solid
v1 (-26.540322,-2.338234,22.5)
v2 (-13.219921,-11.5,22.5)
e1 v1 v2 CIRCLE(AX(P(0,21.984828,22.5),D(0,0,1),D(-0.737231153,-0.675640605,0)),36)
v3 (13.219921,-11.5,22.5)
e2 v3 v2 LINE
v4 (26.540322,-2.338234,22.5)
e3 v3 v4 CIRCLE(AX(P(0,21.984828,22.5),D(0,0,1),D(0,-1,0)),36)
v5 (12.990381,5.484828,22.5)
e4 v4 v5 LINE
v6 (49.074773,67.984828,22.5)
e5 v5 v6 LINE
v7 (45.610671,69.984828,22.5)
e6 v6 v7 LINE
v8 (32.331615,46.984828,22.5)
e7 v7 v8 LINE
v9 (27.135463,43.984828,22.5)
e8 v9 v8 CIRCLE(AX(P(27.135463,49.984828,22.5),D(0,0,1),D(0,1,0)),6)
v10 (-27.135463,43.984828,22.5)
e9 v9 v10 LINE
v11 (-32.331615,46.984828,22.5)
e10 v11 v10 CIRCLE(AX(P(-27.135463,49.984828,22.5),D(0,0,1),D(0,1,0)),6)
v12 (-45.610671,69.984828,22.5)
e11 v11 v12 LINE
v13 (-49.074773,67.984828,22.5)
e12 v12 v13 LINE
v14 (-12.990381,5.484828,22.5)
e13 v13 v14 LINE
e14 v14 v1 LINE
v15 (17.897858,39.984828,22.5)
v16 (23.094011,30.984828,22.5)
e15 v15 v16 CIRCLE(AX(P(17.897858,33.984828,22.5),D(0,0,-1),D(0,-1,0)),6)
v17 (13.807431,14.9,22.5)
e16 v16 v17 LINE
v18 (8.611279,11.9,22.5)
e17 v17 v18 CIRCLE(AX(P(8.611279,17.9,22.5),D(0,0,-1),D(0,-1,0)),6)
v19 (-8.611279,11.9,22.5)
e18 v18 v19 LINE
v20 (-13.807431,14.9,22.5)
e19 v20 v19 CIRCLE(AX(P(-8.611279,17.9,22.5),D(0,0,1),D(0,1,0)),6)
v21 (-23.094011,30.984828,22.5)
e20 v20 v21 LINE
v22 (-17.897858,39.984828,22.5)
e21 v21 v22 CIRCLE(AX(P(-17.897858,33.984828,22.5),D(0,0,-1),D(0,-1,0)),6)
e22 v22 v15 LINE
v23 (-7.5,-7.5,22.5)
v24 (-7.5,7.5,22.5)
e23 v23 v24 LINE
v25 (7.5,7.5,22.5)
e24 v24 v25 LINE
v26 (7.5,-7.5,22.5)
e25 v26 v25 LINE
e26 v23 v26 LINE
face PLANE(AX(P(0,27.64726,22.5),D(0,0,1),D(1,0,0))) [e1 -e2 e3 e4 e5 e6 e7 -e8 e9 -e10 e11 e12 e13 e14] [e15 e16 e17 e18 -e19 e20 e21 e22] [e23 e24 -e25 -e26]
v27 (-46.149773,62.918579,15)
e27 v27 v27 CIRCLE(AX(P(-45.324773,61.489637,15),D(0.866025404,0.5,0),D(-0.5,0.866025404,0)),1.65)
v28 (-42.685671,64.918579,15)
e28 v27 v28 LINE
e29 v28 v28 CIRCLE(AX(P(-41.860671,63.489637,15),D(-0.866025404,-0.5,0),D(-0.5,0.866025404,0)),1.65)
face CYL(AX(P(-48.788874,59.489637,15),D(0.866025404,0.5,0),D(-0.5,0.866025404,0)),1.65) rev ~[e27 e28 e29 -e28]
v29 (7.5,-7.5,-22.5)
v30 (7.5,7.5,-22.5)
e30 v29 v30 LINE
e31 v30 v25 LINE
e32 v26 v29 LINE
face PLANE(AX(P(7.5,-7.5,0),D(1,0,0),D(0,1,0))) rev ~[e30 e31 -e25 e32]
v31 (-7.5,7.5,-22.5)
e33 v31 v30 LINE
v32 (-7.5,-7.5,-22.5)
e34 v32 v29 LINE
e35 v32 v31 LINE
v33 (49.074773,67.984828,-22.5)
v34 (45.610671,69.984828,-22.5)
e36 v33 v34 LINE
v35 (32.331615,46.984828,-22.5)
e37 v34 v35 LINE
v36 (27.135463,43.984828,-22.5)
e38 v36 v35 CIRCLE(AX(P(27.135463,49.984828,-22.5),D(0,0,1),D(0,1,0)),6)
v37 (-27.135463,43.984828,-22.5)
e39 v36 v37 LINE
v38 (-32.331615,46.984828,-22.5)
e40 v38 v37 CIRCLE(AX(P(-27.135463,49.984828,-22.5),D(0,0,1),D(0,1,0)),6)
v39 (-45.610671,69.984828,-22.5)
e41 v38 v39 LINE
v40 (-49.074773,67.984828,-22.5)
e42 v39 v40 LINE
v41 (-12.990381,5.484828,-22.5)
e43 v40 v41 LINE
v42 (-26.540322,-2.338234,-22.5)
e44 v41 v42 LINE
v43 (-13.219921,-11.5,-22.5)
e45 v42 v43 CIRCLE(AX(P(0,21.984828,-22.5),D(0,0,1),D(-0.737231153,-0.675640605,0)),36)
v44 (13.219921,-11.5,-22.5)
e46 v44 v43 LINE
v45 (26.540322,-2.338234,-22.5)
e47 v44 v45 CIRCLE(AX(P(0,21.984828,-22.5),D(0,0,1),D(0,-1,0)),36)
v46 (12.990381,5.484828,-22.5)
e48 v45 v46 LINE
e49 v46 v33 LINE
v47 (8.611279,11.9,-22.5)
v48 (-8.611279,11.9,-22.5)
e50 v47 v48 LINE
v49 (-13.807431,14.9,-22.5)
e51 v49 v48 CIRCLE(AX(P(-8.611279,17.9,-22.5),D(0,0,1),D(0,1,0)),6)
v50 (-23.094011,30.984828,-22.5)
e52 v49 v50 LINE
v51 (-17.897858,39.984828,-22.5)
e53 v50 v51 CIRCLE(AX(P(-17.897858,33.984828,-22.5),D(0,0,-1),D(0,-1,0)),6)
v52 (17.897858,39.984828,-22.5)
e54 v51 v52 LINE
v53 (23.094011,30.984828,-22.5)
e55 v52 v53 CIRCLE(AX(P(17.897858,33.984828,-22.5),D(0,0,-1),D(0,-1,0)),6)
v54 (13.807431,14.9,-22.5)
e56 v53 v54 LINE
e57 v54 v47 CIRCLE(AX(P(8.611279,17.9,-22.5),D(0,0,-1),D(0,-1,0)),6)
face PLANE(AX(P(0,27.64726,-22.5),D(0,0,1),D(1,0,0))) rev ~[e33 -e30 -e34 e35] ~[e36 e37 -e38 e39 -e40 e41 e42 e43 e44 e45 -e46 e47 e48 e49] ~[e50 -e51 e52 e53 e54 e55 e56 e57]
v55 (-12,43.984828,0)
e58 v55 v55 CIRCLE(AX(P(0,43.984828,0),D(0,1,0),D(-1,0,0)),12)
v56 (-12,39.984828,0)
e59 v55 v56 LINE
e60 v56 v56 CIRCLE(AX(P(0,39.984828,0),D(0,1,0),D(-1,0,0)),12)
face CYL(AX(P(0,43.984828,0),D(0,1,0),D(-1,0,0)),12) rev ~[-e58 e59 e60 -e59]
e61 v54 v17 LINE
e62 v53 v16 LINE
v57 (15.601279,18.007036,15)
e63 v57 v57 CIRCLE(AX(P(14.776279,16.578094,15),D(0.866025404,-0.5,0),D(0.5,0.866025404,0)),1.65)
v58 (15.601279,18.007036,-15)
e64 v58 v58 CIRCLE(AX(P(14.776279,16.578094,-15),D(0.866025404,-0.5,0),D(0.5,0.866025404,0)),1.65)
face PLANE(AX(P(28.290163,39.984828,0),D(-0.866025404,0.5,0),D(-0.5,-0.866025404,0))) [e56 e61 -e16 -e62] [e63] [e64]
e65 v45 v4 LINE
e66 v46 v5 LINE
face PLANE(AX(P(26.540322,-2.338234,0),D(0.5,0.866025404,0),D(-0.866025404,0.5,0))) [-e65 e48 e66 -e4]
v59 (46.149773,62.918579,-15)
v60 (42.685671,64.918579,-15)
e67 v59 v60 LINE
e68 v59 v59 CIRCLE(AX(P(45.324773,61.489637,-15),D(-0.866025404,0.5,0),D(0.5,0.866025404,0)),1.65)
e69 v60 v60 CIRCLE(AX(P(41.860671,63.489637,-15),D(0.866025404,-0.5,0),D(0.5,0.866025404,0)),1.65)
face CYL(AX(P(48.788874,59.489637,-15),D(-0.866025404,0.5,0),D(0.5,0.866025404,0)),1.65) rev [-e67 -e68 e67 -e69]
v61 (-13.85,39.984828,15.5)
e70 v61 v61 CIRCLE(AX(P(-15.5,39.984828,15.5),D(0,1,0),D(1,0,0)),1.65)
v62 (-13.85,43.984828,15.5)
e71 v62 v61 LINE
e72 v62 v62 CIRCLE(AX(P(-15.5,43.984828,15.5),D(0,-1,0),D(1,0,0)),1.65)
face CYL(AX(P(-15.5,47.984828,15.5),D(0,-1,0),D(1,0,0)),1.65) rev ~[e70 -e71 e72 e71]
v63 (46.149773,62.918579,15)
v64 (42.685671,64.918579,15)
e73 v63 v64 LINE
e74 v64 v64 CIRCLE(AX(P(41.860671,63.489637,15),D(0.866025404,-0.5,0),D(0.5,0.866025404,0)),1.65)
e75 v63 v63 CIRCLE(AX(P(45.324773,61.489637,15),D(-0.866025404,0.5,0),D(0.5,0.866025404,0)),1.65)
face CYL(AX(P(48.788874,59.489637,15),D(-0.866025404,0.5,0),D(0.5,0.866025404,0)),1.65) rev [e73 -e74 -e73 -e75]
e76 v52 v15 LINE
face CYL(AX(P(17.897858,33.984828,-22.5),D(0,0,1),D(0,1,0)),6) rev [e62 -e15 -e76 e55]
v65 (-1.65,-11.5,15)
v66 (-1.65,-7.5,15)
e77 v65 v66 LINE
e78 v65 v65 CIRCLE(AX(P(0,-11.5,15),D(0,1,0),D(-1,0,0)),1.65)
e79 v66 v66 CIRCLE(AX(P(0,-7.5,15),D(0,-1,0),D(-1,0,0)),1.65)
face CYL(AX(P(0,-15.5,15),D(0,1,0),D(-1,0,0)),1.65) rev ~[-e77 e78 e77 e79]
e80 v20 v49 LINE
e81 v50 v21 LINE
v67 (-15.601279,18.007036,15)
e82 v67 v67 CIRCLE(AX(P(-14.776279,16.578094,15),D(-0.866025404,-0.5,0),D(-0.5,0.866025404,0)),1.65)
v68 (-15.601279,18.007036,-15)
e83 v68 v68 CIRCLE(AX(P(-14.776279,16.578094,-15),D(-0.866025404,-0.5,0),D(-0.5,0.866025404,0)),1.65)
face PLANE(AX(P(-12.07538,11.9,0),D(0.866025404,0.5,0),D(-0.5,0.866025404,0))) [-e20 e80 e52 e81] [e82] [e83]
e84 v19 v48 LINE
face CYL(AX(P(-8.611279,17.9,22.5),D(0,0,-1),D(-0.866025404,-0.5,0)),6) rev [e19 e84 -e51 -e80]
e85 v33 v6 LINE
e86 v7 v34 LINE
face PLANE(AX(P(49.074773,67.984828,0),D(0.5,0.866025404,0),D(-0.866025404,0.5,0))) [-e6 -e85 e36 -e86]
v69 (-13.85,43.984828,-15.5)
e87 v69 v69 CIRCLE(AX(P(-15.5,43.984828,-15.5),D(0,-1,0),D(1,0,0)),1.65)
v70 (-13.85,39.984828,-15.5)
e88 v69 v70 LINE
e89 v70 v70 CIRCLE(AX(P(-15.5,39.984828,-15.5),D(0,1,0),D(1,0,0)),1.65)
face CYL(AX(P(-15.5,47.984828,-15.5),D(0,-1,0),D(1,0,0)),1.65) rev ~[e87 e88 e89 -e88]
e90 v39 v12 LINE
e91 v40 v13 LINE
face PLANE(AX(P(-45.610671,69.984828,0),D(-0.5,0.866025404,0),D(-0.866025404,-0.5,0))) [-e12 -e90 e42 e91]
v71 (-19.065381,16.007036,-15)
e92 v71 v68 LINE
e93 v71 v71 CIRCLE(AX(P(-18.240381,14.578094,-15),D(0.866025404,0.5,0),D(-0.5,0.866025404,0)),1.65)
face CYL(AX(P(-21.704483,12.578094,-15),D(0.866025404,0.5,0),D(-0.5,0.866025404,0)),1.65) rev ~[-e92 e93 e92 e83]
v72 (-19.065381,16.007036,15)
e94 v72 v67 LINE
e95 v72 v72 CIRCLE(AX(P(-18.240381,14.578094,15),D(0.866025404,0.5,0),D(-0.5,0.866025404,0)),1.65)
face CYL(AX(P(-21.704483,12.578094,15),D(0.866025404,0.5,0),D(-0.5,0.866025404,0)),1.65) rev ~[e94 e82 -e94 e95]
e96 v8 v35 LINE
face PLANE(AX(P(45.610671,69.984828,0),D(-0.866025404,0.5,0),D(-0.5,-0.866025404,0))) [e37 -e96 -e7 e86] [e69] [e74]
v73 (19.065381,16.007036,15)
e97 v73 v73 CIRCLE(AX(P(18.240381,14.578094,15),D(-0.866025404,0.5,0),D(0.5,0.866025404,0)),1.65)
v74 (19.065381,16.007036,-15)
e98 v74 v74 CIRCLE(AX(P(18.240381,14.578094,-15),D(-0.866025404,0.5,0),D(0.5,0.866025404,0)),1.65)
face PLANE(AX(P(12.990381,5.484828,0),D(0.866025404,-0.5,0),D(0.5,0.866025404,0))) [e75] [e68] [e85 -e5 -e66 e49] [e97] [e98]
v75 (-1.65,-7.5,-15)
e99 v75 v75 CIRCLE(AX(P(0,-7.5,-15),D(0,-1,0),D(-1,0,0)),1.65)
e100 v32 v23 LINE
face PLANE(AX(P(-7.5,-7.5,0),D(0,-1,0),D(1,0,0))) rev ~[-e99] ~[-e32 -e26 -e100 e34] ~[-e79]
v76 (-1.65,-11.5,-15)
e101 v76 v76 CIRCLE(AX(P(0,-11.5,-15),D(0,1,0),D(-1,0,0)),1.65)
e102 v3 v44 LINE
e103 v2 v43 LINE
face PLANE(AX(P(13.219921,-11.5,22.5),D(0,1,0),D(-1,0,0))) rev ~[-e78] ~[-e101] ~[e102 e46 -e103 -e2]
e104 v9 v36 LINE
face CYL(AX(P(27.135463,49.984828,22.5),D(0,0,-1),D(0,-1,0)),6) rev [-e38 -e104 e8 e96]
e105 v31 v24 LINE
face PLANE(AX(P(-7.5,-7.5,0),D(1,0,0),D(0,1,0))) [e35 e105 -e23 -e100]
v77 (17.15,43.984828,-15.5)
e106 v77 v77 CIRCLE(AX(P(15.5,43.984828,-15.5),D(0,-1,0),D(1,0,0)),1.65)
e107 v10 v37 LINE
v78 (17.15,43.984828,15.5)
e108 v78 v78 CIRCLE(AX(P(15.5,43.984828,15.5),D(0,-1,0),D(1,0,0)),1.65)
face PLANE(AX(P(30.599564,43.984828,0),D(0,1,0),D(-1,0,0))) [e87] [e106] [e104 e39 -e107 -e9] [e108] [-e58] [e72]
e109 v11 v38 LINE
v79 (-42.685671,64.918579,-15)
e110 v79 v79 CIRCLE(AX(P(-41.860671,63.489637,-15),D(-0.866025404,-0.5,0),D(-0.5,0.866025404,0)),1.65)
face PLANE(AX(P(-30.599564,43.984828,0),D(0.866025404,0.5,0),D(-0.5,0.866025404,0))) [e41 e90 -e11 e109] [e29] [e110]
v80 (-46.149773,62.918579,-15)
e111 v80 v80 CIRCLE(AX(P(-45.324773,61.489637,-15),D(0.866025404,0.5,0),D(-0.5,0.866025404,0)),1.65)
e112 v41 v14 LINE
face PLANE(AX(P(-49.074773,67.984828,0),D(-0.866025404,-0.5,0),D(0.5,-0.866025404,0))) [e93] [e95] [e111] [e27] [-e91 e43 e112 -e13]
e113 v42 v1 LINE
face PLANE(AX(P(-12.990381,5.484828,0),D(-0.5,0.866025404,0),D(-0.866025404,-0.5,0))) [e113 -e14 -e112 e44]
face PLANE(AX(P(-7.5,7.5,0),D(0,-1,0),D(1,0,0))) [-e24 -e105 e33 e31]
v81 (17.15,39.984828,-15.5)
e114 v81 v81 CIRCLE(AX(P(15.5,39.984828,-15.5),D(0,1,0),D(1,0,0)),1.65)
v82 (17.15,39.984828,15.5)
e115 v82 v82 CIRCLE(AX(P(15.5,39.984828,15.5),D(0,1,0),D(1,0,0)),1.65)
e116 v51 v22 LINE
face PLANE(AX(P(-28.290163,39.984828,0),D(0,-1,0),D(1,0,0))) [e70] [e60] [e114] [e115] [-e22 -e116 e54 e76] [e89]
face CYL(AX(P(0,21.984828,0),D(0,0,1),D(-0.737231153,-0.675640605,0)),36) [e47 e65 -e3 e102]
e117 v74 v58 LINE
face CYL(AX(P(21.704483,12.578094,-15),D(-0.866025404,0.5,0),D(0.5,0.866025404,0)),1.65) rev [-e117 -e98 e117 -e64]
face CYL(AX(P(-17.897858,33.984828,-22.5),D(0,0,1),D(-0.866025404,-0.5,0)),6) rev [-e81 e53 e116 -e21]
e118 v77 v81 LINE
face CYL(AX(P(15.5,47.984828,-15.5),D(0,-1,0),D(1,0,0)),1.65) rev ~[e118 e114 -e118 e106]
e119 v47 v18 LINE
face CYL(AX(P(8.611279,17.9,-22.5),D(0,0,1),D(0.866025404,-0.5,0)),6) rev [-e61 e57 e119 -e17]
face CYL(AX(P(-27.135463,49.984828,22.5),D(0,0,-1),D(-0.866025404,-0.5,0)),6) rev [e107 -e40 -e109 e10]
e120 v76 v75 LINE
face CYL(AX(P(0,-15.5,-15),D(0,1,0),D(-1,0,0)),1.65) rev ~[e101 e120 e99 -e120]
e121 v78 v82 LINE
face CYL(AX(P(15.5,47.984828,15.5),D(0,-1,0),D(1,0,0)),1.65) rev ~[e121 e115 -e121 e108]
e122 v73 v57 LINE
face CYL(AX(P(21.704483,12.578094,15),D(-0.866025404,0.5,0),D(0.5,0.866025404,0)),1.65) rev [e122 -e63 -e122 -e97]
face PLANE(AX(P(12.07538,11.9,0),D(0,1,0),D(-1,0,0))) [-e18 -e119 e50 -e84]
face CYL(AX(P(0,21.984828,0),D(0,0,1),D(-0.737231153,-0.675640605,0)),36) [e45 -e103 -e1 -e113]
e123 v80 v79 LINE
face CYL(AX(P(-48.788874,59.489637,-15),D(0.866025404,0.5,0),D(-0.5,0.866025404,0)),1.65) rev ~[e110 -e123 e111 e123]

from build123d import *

# Parameters (mm, degrees)
F0_W      = 15
F0_H      = 15
F1_DEPTH  = 22.5
F2_R      = 12
F3_DEPTH  = 4
F4_D      = 3.3
F4_DEPTH  = 4
F4_TIP    = 0.9914200214
F6_D      = 3.3
F6_DEPTH  = 4
F6_TIP    = 0.9914200214
F7_R      = 6
F9_DEPTH  = 45
F11_D     = 3.3
F11_DEPTH = 4
F11_TIP   = 0.9914200214


# Not quite as in the source:
# - a pattern or mirror of a feature is missing from the dataset's text; its kind, count and spacing are read off the source's solid


with BuildPart() as f1:
    # F0 (on Top) → F1 (new body, symmetric)
    with BuildSketch(Plane.XY):
        with BuildLine():
            Line((-30.5995642671, 43.9848275573), (-45.610671266, 69.9848275573))
            Line((-45.610671266, 69.9848275573), (-49.0747728811, 67.9848275573))
            Line((-49.0747728811, 67.9848275573), (-12.9903810568, 5.4848275573))
            Line((-12.9903810568, 5.4848275573), (-26.5403215145, -2.3382342135))
            ThreePointArc((-26.5403215145, -2.3382342135), (-14.4977545891, -10.966881228), (0, -14.0151724427))
            ThreePointArc((0, -14.0151724427), (14.4977545891, -10.966881228), (26.5403215145, -2.3382342135))
            Line((26.5403215145, -2.3382342135), (12.9903810568, 5.4848275573))
            Line((12.9903810568, 5.4848275573), (49.0747728811, 67.9848275573))
            Line((49.0747728811, 67.9848275573), (45.610671266, 69.9848275573))
            Line((45.610671266, 69.9848275573), (30.5995642671, 43.9848275573))
            Line((30.5995642671, 43.9848275573), (28.2901631903, 39.9848275573))
            Line((28.2901631903, 39.9848275573), (12.0753804399, 11.9))
            Line((12.0753804399, 11.9), (0, 11.9))
            Line((0, 11.9), (-12.0753804399, 11.9))
            Line((-12.0753804399, 11.9), (-28.2901631903, 39.9848275573))
            Line((-28.2901631903, 39.9848275573), (-30.5995642671, 43.9848275573))
        make_face()
        Rectangle(F0_W, F0_H, mode=Mode.SUBTRACT)
        Polygon((0, 43.9848275573), (-30.5995642671, 43.9848275573), (-28.2901631903, 39.9848275573), (0, 39.9848275573), (28.2901631903, 39.9848275573), (30.5995642671, 43.9848275573), align=None)
    extrude(amount=F1_DEPTH, both=True)

    # F2 (on face) → F3 (cut, through all)
    with BuildSketch(Plane(origin=(0, 43.9848275573, 0), x_dir=(-1, 0, 0), z_dir=(0, 1, 0))):
        Circle(F2_R)
    extrude(amount=-F3_DEPTH, mode=Mode.SUBTRACT)

    # F4
    with Locations(Plane(origin=(0, 43.9848275573, 0), x_dir=(-1, 0, 0), z_dir=(0, 1, 0))):
        with Locations((15.5, 15.5), (15.5, -15.5), (-15.5, -15.5), (-15.5, 15.5)):
            Hole(F4_D / 2, depth=F4_DEPTH)
            with Locations((0, 0, -(F4_DEPTH + F4_TIP / 2))):  # 118° drill point
                Cone(0, F4_D / 2, F4_TIP, mode=Mode.SUBTRACT)

    # F6
    with Locations(Plane(origin=(-7.3677857926, -4.2537931107, 0), x_dir=(0.5, -0.8660254038, 0), z_dir=(-0.8660254038, -0.5, 0))):
        with Locations((-21.7451905284, -15), (-75.9139741771, -15), (-75.9139741771, 15), (-21.7451905284, 15)):
            f6 = Hole(F6_D / 2, depth=F6_DEPTH)
            with Locations((0, 0, -(F6_DEPTH + F6_TIP / 2))):  # 118° drill point
                Cone(0, F6_D / 2, F6_TIP, mode=Mode.SUBTRACT)

    # F6_copies: F6 across plane
    add(f6.mirror(Plane(origin=(0, 0, 0), x_dir=(0, 0, 1), z_dir=(1, 0, 0))), mode=Mode.SUBTRACT)

    # F7
    f7_edges = [f1.edges().sort_by_distance(p)[0] for p in [
        (-28.290163, 39.984828, 0),
        (-12.07538, 11.9, 0),
        (12.07538, 11.9, 0),
        (28.290163, 39.984828, 0),
        (-30.599564, 43.984828, 0),
        (30.599564, 43.984828, 0),
    ]]
    fillet(f7_edges, radius=F7_R)

    # F8 (on face) → F9 (cut, through all)
    with BuildSketch(Plane.XY.offset(22.5)):
        with BuildLine():
            Line((13.2199214619, -11.5), (-13.2199214619, -11.5))
            ThreePointArc((-13.2199214619, -11.5), (0, -14.0151724427), (13.2199214619, -11.5))
        make_face()
    extrude(amount=-F9_DEPTH, mode=Mode.SUBTRACT)

    # F11
    with Locations(Plane.XZ.offset(11.5)):
        with Locations((0, 15), (0, -15)):
            Hole(F11_D / 2, depth=F11_DEPTH)
            with Locations((0, 0, -(F11_DEPTH + F11_TIP / 2))):  # 118° drill point
                Cone(0, F11_D / 2, F11_TIP, mode=Mode.SUBTRACT)


solid = f1.part
